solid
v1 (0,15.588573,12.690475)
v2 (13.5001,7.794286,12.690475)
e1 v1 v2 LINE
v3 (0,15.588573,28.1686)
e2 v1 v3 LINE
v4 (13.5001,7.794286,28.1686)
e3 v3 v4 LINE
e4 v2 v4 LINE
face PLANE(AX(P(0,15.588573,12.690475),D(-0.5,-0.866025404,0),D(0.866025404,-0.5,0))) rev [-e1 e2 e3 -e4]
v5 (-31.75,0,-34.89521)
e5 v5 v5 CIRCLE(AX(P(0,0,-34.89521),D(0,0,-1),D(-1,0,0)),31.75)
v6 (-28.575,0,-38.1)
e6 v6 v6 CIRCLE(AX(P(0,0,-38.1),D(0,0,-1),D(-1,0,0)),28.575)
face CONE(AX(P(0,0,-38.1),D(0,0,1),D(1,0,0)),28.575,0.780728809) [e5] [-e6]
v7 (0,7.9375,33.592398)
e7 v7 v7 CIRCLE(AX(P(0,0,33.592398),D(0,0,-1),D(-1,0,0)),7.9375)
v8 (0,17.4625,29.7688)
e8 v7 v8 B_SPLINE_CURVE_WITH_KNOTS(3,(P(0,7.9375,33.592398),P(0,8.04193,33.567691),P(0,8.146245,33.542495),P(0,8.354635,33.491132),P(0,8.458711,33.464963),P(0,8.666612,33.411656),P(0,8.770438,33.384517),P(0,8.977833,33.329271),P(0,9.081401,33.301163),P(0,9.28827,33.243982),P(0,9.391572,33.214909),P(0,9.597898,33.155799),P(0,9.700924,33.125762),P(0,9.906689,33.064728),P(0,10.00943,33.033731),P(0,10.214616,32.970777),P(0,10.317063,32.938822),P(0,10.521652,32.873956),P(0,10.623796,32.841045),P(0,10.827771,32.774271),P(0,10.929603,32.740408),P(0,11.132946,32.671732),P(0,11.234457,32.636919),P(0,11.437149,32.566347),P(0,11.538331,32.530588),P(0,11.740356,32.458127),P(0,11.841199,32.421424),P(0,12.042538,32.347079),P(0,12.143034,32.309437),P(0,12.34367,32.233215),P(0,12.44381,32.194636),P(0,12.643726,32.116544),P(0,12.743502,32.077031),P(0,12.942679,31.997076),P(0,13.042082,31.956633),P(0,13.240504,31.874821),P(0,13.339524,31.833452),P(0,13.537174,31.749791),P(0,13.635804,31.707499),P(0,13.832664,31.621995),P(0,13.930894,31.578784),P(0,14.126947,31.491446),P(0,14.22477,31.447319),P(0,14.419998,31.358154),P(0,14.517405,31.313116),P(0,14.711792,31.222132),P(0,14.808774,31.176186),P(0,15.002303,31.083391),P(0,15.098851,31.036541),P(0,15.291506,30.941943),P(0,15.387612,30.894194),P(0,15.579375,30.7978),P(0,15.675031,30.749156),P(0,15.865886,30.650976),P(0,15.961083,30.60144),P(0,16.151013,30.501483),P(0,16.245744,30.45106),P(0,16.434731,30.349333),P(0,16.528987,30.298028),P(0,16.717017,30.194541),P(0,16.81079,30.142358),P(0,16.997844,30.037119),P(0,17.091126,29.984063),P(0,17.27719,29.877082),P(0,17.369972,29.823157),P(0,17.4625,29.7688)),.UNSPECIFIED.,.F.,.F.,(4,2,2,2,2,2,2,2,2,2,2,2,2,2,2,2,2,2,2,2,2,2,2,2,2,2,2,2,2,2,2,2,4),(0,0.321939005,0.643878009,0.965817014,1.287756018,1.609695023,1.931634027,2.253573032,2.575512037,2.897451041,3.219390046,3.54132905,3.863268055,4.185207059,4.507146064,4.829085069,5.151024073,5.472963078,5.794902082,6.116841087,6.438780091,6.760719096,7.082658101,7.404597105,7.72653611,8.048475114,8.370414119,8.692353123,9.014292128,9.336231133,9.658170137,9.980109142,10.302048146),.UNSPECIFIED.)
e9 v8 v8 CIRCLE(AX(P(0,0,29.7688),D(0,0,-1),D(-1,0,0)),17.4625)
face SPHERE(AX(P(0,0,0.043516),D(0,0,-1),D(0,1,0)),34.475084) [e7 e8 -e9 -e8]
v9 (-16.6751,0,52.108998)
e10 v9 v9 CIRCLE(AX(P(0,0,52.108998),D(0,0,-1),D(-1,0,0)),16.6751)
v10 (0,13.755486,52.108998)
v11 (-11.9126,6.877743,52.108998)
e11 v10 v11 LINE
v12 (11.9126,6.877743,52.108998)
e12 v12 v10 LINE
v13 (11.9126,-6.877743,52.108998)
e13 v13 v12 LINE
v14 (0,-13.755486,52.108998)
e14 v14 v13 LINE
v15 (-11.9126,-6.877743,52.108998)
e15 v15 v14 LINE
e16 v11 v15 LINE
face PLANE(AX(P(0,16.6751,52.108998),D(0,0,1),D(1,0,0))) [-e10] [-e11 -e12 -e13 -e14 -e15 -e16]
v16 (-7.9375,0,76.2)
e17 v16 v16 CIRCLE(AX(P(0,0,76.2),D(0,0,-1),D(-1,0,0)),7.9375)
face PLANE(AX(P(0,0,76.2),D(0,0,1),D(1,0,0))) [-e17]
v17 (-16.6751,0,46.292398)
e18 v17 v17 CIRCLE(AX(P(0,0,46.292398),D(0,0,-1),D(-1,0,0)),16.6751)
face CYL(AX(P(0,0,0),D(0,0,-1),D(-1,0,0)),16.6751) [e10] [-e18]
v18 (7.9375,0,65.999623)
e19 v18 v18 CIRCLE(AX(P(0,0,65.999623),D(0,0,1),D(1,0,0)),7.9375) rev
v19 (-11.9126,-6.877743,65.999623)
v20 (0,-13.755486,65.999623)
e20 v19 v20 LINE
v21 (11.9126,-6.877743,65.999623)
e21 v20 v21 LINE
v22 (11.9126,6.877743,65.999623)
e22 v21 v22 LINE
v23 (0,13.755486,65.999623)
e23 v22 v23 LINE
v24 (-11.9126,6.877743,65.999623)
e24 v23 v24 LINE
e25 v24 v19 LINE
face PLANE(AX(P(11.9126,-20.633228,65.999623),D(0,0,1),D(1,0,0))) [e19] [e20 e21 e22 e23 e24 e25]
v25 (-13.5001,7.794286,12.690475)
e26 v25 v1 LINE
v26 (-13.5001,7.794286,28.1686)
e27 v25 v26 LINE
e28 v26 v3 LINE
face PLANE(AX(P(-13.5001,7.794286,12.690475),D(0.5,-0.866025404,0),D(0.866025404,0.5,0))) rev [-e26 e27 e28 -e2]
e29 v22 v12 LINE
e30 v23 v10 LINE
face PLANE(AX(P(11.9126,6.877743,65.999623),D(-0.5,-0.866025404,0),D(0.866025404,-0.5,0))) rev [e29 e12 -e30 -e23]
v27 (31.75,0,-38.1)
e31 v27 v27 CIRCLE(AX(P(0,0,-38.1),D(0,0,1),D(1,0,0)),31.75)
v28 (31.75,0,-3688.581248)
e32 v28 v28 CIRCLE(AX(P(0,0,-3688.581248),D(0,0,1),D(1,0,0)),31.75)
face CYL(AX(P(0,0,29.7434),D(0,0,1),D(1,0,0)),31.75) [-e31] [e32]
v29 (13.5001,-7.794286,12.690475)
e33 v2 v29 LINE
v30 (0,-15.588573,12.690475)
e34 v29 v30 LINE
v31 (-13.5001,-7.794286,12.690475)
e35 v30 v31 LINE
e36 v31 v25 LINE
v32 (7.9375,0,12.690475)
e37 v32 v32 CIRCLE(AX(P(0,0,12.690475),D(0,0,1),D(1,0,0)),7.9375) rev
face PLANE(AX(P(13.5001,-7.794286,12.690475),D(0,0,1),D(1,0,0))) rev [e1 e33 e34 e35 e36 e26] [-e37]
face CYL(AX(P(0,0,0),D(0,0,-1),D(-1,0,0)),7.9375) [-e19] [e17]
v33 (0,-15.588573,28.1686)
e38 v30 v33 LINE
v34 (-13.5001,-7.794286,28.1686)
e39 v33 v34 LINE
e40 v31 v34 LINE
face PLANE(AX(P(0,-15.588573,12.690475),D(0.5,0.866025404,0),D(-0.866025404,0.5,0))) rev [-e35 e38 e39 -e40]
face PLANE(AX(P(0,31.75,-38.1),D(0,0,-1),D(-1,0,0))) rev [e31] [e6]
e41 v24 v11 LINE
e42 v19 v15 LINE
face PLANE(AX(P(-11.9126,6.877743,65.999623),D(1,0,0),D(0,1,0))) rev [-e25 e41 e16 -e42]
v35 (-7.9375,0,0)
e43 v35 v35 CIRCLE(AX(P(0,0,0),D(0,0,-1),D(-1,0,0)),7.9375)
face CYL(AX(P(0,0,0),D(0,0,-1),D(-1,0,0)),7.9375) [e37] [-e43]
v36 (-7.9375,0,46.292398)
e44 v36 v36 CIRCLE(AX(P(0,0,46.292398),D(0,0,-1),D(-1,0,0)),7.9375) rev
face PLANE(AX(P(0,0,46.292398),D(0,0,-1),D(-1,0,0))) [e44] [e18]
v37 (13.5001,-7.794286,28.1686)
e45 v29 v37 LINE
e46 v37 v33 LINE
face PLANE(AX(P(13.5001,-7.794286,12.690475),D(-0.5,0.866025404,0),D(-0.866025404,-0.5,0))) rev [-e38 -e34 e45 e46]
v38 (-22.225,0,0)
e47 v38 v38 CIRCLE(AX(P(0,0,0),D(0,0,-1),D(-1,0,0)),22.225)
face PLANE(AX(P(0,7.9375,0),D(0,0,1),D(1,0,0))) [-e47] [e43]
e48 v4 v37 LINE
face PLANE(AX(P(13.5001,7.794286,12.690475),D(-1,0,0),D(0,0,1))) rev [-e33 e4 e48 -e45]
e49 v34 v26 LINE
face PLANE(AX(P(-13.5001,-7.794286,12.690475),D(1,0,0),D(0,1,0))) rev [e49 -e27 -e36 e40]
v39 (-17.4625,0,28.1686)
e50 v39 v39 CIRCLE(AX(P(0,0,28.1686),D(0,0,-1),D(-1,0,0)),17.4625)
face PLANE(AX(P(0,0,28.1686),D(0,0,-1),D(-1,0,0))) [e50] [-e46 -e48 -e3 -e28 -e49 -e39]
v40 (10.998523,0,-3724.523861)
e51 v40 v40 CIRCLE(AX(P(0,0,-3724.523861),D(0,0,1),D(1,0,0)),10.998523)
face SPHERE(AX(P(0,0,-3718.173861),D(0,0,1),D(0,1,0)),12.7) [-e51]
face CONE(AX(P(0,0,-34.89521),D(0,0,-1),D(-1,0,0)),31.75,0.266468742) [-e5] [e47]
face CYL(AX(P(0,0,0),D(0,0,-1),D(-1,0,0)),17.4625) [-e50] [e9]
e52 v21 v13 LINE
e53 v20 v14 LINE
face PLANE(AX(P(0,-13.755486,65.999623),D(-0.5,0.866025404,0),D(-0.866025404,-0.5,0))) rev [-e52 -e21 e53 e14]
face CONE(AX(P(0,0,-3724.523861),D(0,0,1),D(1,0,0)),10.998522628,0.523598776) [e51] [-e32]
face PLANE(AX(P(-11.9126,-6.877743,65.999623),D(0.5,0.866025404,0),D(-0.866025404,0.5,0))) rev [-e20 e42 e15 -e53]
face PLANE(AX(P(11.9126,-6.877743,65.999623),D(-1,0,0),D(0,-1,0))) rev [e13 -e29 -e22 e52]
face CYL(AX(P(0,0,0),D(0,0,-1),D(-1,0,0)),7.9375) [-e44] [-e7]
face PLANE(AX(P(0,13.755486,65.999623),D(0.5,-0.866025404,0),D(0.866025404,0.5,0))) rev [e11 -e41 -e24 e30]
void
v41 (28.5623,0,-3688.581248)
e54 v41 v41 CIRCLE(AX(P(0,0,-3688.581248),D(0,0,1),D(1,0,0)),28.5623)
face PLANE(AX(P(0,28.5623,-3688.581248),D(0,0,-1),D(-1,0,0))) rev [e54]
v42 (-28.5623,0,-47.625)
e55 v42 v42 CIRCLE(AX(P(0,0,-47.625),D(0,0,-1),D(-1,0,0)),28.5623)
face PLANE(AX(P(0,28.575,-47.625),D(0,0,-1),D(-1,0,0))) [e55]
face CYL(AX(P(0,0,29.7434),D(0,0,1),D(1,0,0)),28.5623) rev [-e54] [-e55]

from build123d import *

# Parameters (mm, degrees)
BOSS_REVOLVE3_START         = 12.690475
BOSS_REVOLVE3_OUTLINE_R     = 7.9375
BOSS_REVOLVE3_DEPTH         = 15.478125
BOSS_REVOLVE3_START_2       = 46.292398399
BOSS_REVOLVE3_2_OUTLINE_R   = 16.6751
BOSS_REVOLVE3_2_OUTLINE_R_2 = 7.9375
BOSS_REVOLVE3_2_DEPTH       = 5.8166
BOSS_EXTRUDE2_DEPTH         = 13.890625


# Read off the part's stored shape, not the designer's step: Boss-Revolve3
with BuildPart() as part:
    # Sketch1 → Base-Revolve (revolve)
    with BuildSketch(Plane(origin=(0, 0, 0), x_dir=(0, 0, -1), z_dir=(1, 0, 0)), mode=Mode.PRIVATE) as base_revolve_sk:
        Polygon((-76.2, 0), (-76.2, 7.9375), (0, 7.9375), (0, 22.225), (34.895210283, 31.75), (38.1, 28.575), (47.625, 28.575), (47.625, 0), align=None)
    revolve(base_revolve_sk.sketch.rotate(Axis((0, 0, 0), (0, 0, 1)), 90), axis=Axis((0, 0, 0), (0, 0, 1)))

    # Sketch3 → Boss-Revolve2 (revolve)
    with BuildSketch(Plane(origin=(0, 0, 0), x_dir=(0, 0, -1), z_dir=(1, 0, 0)), mode=Mode.PRIVATE) as boss_revolve2_sk:
        with BuildLine():
            Line((-28.1686, 0), (-28.1686, 17.4625))
            Line((-28.1686, 17.4625), (-29.7688, 17.4625))
            ThreePointArc((-29.7688, 17.4625), (-33.309963658, 9.048473715), (-34.5186, 0))
            Line((-34.5186, 0), (-28.1686, 0))
        make_face()
    revolve(boss_revolve2_sk.sketch.rotate(Axis((0, 0, 0), (0, 0, 1)), 90), axis=Axis((0, 0, 0), (0, 0, 1)))

    # Sketch2 → Boss-Revolve1 (revolve)
    with BuildSketch(Plane(origin=(0, 0, 0), x_dir=(0, 0, -1), z_dir=(1, 0, 0)), mode=Mode.PRIVATE) as boss_revolve1_sk:
        with BuildLine():
            Line((38.1, 31.75), (38.1, 28.5623))
            Line((38.1, 28.5623), (3688.581247583, 28.5623))
            Line((3688.581247583, 28.5623), (3688.581247583, 0))
            Line((3688.581247583, 0), (3730.873860723, 0))
            ThreePointArc((3730.873860723, 0), (3729.172383351, 6.35), (3724.523860723, 10.998522628))
            Line((3724.523860723, 10.998522628), (3688.581247583, 31.75))
            Line((3688.581247583, 31.75), (38.1, 31.75))
        make_face()
    revolve(boss_revolve1_sk.sketch.rotate(Axis((0, 0, 29.7434), (0, 0, -1)), 90), axis=Axis((0, 0, 29.7434), (0, 0, -1)))

    # Boss-Revolve3 outline → Boss-Revolve3 (add)
    with BuildSketch(Plane.XY.offset(BOSS_REVOLVE3_START)):
        Polygon((0, -15.588572738), (13.5001, -7.794286369), (13.5001, 7.794286369), (0, 15.588572738), (-13.5001, 7.794286369), (-13.5001, -7.794286369), align=None)
        Circle(BOSS_REVOLVE3_OUTLINE_R, mode=Mode.SUBTRACT)
    extrude(amount=BOSS_REVOLVE3_DEPTH)

    # Boss-Revolve3 2 outline → Boss-Revolve3 2 (add)
    with BuildSketch(Plane.XY.offset(BOSS_REVOLVE3_START_2)):
        Circle(BOSS_REVOLVE3_2_OUTLINE_R)
        Circle(BOSS_REVOLVE3_2_OUTLINE_R_2, mode=Mode.SUBTRACT)
    extrude(amount=BOSS_REVOLVE3_2_DEPTH)

    # Sketch6 → Boss-Extrude2 (add)
    with BuildSketch(Plane.XY.offset(52.108998399)):
        Polygon((0, -13.755485633), (11.9126, -6.877742817), (11.9126, 6.877742817), (0, 13.755485633), (-11.9126, 6.877742817), (-11.9126, -6.877742817), align=None)
    extrude(amount=BOSS_EXTRUDE2_DEPTH)


solid = part.part
